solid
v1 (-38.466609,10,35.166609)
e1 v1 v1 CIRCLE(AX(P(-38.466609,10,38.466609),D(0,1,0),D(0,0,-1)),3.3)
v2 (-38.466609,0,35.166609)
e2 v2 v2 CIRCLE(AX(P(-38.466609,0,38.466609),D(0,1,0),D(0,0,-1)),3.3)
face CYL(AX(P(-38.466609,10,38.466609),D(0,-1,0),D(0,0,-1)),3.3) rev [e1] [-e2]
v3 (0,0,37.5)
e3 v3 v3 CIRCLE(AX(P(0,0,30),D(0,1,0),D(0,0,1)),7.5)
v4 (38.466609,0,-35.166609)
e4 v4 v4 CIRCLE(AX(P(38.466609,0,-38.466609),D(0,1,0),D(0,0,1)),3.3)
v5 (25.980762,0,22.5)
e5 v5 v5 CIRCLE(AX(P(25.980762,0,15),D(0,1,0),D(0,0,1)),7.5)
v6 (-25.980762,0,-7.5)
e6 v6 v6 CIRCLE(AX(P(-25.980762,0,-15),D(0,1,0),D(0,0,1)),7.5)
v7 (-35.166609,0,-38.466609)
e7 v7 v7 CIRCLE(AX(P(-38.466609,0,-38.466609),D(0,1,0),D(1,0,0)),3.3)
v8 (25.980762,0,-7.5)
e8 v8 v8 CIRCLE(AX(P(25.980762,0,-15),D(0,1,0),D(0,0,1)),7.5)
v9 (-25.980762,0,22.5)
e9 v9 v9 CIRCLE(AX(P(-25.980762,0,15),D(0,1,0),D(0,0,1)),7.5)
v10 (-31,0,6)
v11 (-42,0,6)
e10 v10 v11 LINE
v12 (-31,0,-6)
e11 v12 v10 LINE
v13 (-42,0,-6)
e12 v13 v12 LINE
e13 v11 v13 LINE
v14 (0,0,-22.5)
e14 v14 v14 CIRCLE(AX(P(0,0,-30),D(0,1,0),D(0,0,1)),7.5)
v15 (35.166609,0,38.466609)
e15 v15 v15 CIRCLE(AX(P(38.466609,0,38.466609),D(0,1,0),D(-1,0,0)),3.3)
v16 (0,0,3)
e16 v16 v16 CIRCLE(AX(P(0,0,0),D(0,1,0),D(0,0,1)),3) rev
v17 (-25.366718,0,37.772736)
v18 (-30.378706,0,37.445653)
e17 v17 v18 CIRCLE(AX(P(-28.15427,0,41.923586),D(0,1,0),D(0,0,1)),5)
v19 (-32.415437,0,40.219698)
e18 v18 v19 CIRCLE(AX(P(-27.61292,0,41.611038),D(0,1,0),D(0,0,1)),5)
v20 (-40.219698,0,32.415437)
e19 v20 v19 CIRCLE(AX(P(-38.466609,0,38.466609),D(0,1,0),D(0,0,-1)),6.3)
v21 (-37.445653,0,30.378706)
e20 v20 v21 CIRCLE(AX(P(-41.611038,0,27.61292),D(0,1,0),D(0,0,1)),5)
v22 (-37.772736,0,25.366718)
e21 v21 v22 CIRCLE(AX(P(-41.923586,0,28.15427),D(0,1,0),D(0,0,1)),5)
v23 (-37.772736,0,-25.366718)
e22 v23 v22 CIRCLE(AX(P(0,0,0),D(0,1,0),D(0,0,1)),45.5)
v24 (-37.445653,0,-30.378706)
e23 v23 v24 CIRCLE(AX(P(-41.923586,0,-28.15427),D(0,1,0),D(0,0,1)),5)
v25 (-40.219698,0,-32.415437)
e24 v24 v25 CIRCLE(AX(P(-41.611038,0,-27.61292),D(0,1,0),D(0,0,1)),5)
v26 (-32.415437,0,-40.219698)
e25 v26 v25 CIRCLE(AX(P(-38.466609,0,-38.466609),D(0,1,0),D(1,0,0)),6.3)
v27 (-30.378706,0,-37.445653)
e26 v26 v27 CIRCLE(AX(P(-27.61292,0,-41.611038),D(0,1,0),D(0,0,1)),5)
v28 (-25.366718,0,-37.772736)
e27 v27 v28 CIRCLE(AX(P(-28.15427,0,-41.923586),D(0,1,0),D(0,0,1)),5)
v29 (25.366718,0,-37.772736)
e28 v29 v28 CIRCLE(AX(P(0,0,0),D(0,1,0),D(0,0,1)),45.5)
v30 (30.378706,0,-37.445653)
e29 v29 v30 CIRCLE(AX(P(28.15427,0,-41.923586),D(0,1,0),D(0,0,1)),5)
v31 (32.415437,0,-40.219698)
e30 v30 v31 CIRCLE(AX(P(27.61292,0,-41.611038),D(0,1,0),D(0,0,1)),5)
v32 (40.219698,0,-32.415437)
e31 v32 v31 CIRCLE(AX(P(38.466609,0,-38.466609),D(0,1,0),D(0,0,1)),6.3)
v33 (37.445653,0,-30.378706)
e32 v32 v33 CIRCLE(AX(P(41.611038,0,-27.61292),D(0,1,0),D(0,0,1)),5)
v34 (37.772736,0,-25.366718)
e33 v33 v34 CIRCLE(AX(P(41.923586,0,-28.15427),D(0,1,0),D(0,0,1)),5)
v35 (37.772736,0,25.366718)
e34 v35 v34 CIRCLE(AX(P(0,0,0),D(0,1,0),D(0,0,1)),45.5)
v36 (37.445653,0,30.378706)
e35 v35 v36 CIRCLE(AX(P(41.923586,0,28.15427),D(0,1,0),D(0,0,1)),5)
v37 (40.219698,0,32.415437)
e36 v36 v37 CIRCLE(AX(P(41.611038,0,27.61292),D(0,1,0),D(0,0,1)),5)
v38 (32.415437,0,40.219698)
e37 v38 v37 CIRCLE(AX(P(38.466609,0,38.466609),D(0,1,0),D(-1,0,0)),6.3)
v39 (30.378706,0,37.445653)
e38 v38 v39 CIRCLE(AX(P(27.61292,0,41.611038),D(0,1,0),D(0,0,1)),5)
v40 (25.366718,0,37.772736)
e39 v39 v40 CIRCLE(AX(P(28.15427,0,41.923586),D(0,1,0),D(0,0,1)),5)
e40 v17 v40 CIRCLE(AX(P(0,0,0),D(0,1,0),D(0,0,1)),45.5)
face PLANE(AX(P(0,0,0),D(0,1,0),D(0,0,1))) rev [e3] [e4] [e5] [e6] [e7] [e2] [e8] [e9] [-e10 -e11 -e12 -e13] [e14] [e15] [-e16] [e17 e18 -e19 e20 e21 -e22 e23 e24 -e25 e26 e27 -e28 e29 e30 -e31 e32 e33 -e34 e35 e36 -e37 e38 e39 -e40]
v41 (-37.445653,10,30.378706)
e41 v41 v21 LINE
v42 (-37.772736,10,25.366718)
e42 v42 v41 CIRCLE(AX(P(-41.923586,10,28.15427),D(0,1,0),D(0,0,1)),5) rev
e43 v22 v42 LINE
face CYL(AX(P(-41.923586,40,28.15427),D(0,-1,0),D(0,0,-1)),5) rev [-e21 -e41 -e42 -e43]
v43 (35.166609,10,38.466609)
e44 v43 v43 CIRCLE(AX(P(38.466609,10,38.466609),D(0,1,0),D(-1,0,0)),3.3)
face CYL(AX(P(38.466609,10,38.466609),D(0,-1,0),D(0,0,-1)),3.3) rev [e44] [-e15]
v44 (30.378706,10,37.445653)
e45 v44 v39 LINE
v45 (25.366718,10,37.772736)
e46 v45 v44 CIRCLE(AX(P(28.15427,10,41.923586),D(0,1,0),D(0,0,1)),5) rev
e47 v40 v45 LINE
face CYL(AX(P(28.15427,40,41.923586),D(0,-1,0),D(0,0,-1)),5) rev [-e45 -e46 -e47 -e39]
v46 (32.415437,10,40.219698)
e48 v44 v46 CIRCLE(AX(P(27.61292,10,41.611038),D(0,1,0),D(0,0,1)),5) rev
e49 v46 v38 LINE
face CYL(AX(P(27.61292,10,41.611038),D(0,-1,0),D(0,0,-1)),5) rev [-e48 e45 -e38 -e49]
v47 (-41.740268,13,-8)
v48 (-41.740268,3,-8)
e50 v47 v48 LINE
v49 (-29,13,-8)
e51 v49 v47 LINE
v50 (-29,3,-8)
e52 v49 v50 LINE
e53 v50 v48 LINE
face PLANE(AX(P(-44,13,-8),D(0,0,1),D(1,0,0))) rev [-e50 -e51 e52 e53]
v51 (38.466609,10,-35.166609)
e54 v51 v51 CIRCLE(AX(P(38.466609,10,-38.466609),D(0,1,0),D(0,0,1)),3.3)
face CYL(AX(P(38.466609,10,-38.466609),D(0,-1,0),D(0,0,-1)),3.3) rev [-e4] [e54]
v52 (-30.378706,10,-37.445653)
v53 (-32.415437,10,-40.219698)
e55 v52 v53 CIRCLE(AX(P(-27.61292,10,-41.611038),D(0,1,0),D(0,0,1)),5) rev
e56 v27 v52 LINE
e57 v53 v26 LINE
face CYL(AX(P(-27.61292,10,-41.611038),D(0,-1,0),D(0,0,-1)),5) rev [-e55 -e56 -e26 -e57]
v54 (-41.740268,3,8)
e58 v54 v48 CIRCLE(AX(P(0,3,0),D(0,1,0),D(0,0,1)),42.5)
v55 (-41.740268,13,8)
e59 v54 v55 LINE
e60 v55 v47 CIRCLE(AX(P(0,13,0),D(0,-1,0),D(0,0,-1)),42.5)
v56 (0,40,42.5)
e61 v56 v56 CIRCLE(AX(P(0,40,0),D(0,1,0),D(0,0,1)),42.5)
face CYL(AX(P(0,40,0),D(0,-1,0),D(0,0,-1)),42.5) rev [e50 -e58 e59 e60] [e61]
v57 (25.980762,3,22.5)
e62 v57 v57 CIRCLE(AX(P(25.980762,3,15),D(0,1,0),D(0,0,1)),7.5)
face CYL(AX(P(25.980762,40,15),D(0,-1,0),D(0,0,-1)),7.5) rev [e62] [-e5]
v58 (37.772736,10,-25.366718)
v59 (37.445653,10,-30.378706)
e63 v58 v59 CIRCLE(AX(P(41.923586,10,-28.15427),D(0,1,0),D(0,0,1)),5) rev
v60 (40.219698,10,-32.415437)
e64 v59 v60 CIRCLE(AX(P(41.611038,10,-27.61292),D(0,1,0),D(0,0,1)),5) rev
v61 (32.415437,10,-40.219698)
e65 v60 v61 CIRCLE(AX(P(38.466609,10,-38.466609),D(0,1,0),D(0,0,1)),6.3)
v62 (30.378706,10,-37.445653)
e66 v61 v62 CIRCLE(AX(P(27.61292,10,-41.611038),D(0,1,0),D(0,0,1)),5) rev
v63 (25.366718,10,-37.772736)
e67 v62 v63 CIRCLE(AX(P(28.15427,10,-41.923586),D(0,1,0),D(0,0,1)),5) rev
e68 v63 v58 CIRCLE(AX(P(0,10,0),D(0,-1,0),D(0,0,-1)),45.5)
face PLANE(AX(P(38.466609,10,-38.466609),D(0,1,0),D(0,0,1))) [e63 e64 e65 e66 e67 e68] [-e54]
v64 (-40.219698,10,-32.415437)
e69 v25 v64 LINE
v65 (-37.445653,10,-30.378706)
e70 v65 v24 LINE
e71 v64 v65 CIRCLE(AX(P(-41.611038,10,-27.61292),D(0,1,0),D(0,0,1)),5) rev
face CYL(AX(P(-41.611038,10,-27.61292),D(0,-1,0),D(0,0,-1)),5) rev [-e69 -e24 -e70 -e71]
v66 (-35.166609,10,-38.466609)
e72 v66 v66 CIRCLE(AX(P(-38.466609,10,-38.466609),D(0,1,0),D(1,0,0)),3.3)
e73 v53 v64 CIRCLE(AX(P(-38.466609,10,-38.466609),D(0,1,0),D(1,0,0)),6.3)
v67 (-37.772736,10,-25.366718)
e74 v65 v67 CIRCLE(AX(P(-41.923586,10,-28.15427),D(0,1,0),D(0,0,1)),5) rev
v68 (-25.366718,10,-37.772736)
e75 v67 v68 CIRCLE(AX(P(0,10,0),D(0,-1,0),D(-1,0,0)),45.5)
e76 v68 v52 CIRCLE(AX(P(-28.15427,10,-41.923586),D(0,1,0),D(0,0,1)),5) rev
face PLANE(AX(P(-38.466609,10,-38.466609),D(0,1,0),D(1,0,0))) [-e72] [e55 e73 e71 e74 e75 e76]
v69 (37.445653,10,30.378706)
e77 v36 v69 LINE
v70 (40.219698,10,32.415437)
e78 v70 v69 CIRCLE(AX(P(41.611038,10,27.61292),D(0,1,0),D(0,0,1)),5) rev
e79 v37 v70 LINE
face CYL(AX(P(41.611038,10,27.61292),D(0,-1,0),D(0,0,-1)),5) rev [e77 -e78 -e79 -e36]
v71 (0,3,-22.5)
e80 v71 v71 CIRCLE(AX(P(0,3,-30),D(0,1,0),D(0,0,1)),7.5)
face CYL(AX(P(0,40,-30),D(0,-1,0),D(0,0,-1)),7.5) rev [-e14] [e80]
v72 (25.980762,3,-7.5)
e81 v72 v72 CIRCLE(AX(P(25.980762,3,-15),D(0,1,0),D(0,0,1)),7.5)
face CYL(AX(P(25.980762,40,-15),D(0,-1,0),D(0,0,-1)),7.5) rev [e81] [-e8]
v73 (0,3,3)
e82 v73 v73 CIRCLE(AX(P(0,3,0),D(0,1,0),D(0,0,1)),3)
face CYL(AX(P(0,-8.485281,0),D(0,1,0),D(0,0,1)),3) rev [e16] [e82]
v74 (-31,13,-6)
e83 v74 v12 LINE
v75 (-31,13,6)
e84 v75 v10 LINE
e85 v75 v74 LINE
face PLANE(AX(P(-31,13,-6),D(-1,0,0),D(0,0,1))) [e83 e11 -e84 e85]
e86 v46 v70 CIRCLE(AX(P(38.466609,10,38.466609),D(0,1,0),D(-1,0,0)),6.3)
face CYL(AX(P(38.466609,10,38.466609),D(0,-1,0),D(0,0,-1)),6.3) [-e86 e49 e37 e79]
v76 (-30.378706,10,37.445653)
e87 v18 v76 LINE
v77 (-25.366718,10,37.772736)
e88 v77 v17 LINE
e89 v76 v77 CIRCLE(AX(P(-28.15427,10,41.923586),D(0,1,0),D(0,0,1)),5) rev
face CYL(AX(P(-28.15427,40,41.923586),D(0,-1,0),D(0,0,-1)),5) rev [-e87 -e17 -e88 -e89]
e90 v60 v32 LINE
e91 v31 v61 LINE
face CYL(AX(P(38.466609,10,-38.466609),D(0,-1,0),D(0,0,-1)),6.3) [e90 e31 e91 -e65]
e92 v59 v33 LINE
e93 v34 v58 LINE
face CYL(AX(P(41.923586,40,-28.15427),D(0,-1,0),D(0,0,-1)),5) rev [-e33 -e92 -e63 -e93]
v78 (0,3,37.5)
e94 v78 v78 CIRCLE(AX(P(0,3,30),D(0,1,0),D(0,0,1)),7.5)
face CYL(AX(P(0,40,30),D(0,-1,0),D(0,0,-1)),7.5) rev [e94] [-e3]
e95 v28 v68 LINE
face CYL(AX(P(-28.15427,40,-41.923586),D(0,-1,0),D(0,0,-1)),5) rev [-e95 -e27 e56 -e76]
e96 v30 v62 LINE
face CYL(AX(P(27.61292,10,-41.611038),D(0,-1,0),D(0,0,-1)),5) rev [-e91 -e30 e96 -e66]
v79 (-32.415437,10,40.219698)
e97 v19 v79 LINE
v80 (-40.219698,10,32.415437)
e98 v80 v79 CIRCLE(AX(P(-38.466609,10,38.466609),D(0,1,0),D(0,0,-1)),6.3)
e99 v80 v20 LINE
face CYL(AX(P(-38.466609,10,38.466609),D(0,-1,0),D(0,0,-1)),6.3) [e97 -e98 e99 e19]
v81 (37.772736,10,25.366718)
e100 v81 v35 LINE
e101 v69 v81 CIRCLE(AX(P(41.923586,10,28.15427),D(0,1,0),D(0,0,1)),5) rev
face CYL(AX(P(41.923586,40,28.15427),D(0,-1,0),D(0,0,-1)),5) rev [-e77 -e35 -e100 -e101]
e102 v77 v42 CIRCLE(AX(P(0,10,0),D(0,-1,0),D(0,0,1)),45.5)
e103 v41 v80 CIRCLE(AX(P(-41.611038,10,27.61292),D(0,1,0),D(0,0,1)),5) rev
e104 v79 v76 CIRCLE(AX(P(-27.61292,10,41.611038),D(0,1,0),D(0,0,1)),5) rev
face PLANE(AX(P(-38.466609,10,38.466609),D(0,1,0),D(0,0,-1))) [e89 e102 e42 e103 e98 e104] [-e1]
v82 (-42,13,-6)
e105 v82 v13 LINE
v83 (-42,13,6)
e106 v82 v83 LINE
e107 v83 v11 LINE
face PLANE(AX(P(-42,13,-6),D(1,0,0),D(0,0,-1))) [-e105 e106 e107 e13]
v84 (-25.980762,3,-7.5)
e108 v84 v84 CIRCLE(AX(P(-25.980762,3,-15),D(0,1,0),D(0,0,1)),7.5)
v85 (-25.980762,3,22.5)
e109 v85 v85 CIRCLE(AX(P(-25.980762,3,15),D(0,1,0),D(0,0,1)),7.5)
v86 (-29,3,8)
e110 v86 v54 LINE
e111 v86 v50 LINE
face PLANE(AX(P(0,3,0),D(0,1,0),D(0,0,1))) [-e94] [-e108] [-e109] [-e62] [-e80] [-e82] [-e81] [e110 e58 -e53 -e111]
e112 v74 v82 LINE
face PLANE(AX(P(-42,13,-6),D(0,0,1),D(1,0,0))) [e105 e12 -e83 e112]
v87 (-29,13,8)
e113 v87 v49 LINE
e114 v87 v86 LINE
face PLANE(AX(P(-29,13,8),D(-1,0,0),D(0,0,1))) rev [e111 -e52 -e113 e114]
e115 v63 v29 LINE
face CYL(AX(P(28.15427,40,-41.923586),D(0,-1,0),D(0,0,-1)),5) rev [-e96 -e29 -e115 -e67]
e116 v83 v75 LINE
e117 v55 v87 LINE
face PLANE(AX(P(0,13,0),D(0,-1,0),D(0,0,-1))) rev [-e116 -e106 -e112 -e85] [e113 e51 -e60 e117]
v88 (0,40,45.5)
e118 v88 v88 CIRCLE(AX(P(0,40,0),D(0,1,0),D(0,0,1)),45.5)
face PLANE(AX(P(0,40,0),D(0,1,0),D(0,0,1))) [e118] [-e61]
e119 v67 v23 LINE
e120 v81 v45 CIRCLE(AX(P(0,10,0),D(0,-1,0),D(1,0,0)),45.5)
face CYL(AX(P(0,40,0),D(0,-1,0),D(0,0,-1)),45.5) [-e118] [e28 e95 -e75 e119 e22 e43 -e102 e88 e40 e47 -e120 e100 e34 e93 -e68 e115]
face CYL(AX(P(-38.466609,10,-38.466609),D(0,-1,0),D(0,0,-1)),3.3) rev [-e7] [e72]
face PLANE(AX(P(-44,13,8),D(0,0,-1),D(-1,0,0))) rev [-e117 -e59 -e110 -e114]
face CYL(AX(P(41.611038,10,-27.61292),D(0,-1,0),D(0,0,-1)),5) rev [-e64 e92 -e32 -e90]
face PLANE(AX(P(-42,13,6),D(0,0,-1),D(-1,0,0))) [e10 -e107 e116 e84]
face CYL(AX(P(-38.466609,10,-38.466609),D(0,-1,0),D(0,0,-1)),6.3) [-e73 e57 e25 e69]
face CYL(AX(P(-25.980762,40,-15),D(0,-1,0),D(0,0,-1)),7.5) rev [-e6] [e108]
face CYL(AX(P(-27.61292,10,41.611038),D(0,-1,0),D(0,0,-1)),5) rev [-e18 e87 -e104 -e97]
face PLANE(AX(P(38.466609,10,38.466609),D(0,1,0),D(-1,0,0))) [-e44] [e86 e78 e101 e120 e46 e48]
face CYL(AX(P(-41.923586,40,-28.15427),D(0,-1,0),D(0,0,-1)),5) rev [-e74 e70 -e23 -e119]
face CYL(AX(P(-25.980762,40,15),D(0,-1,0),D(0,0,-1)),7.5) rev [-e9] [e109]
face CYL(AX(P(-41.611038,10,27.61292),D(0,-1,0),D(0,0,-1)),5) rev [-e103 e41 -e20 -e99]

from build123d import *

# Parameters (mm, degrees)
SKETCH1_R               = 45.5
BOSS_EXTRUDE1_DEPTH     = 40
SHELL1_T                = -3
CUT_EXTRUDE2_DEPTH      = 76.766087401
CUT_EXTRUDE2_DEPTH_BACK = 76.766087401
SKETCH3_R               = 7.5
SKETCH4_R               = 3
CUT_EXTRUDE3_DEPTH      = 3
SKETCH6_W               = 15
SKETCH6_H               = 16
SKETCH6_W_2             = 11
SKETCH6_H_2             = 12
BOSS_EXTRUDE2_DEPTH     = 10
SKETCH7_W               = 11
SKETCH7_H               = 12
CUT_EXTRUDE5_DEPTH      = 3
SKETCH8_R               = 3.3
BOSS_EXTRUDE3_DEPTH     = 10
CIRPATTERN1_COUNT       = 4
FILLET1_R               = 5


with BuildPart() as part:
    # Sketch1 → Boss-Extrude1 (new body)
    with BuildSketch(Plane(origin=(0, 0, 0), x_dir=(1, 0, 0), z_dir=(0, 1, 0))):
        with Locations(Location((0, 0, 0), (0, 0, 270))):
            Circle(SKETCH1_R)
    extrude(amount=BOSS_EXTRUDE1_DEPTH)

    # Shell1
    shell1_openings = [part.faces().sort_by_distance(p)[0] for p in [
        (0, 40, 0),
    ]]
    offset(amount=SHELL1_T, openings=shell1_openings, kind=Kind.INTERSECTION)

    # Sketch3 → Cut-Extrude2 (cut, two sides: drawn at the far end of the back side and taken through both)
    with BuildSketch(Plane.XZ.offset(-CUT_EXTRUDE2_DEPTH_BACK)):
        with Locations(Location((0, 30, 0), (0, 0, 90))):
            Circle(SKETCH3_R)
        with Locations(Location((25.980762114, 15, 0), (0, 0, 90))):
            Circle(SKETCH3_R)
        with Locations(Location((25.980762114, -15, 0), (0, 0, 90))):
            Circle(SKETCH3_R)
        with Locations(Location((0, -30, 0), (0, 0, 90))):
            Circle(SKETCH3_R)
        with Locations(Location((-25.980762114, -15, 0), (0, 0, 90))):
            Circle(SKETCH3_R)
        with Locations(Location((-25.980762114, 15, 0), (0, 0, 90))):
            Circle(SKETCH3_R)
    extrude(amount=CUT_EXTRUDE2_DEPTH + CUT_EXTRUDE2_DEPTH_BACK, mode=Mode.SUBTRACT)

    # Sketch4 → Cut-Extrude3 (cut)
    with BuildSketch(Plane(origin=(0, 3, 0), x_dir=(1, 0, 0), z_dir=(0, 1, 0))):
        with Locations(Location((0, 0, 0), (0, 0, 270))):
            Circle(SKETCH4_R)
    extrude(amount=-CUT_EXTRUDE3_DEPTH, mode=Mode.SUBTRACT)

    # Sketch6 → Boss-Extrude2 (add)
    with BuildSketch(Plane(origin=(0, 3, 0), x_dir=(1, 0, 0), z_dir=(0, 1, 0))):
        with Locations((-36.5, 0)):
            Rectangle(SKETCH6_W, SKETCH6_H)
        with Locations((-36.5, 0)):
            Rectangle(SKETCH6_W_2, SKETCH6_H_2, mode=Mode.SUBTRACT)
    extrude(amount=BOSS_EXTRUDE2_DEPTH)

    # Sketch7 → Cut-Extrude5 (cut)
    with BuildSketch(Plane(origin=(0, 3, 0), x_dir=(1, 0, 0), z_dir=(0, 1, 0))):
        with Locations((-36.5, 0)):
            Rectangle(SKETCH7_W, SKETCH7_H)
    extrude(amount=-CUT_EXTRUDE5_DEPTH, mode=Mode.SUBTRACT)

    # Sketch8 → Boss-Extrude3 (add)
    with BuildSketch(Plane(origin=(0, 0, 0), x_dir=(1, 0, 0), z_dir=(0, 1, 0))):
        with BuildLine():
            Line((32.166608897, 38.466608897), (27.854823504, 35.97719844))
            ThreePointArc((27.854823504, 35.97719844), (32.173358544, 32.173358544), (35.97719844, 27.854823504))
            Line((35.97719844, 27.854823504), (38.466608897, 32.166608897))
            ThreePointArc((38.466608897, 32.166608897), (42.921381618, 42.921381618), (32.166608897, 38.466608897))
        make_face()
        with Locations(Location((38.466608897, 38.466608897, 0), (0, 0, 270))):
            Circle(SKETCH8_R, mode=Mode.SUBTRACT)
    boss_extrude3 = extrude(amount=BOSS_EXTRUDE3_DEPTH)

    # CirPattern1: Boss-Extrude3 ×4 about axis
    cirpattern1_axis = Axis((0, 0, 0), (0, 1, 0))
    for i in range(1, CIRPATTERN1_COUNT):
        add(boss_extrude3.rotate(cirpattern1_axis, i * 360 / CIRPATTERN1_COUNT))

    # Fillet1
    # the kernel refuses this fillet: 5 mm, written as the material it adds along each edge
    with BuildSketch(Plane(origin=(-38.466608897, 0, 32.166608897), x_dir=(0.5000000000000063, 0, -0.866025403784435), z_dir=(0, 1, 0)), Plane(origin=(32.166608897, 0, 38.466608897), x_dir=(-0.8660254037844374, 0, -0.5000000000000022), z_dir=(0, 1, 0)), Plane(origin=(38.466608897, 0, -32.166608897), x_dir=(-0.5000000000000032, 0, 0.8660254037844368), z_dir=(0, 1, 0)), Plane(origin=(-32.166608897, 0, -38.466608897), x_dir=(0.8660254037844356, 0, 0.5000000000000054), z_dir=(0, 1, 0))) as fillet1_piece_1:
        with BuildLine():
            CenterArc((2.371395832, 5), FILLET1_R, 226.156864412, 43.843135588)
            ThreePointArc((-1.092035972, 1.39380531), (-0.496806454, 0.735459519), (0, 0))
            Line((0, 0), (2.371395832, 0))
        make_face()
    extrude(amount=10)
    with BuildSketch(Plane(origin=(-32.166608897, 0, 38.466608897), x_dir=(0.8660254037844327, 0, -0.5000000000000103), z_dir=(0, 1, 0)), Plane(origin=(38.466608897, 0, 32.166608897), x_dir=(-0.5000000000000117, 0, -0.8660254037844319), z_dir=(0, 1, 0)), Plane(origin=(32.166608897, 0, -38.466608897), x_dir=(-0.8660254037844319, 0, 0.5000000000000117), z_dir=(0, 1, 0)), Plane(origin=(-38.466608897, 0, -32.166608897), x_dir=(0.500000000000011, 0, 0.8660254037844324), z_dir=(0, 1, 0))) as fillet1_piece_2:
        with BuildLine():
            CenterArc((2.371395832, -5), FILLET1_R, 90, 43.843135588)
            ThreePointArc((-1.092035972, -1.39380531), (-0.496806454, -0.735459519), (0, 0))
            Line((0, 0), (2.371395832, 0))
        make_face()
    extrude(amount=10)
    with BuildSketch(Plane(origin=(-27.854823504, 0, 35.97719844), x_dir=(0.8108999282777639, 0, 0.5851848479917412), z_dir=(0, 1, 0)), Plane(origin=(35.97719844, 0, 27.854823504), x_dir=(0.5851848479917567, 0, -0.8108999282777527), z_dir=(0, 1, 0)), Plane(origin=(27.854823504, 0, -35.97719844), x_dir=(-0.8108999282777679, 0, -0.5851848479917359), z_dir=(0, 1, 0)), Plane(origin=(-35.97719844, 0, -27.854823504), x_dir=(-0.5851848479917252, 0, 0.8108999282777755), z_dir=(0, 1, 0))) as fillet1_piece_3:
        with BuildLine():
            CenterArc((3.236915302, -4.997156955), FILLET1_R, 91.932257762, 63.883791986)
            Line((-1.32425924, -2.948819386), (0, 0))
            ThreePointArc((0, 0), (1.534162982, -0.025871708), (3.068325963, 0))
        make_face()
    extrude(amount=10)
    with BuildSketch(Plane(origin=(-35.97719844, 0, 27.854823504), x_dir=(-0.5851848479917389, 0, -0.8108999282777657), z_dir=(0, 1, 0)), Plane(origin=(27.854823504, 0, 35.97719844), x_dir=(-0.8108999282777541, 0, 0.5851848479917549), z_dir=(0, 1, 0)), Plane(origin=(35.97719844, 0, -27.854823504), x_dir=(0.5851848479917436, 0, 0.8108999282777621), z_dir=(0, 1, 0)), Plane(origin=(-27.854823504, 0, -35.97719844), x_dir=(0.8108999282777745, 0, -0.5851848479917268), z_dir=(0, 1, 0))) as fillet1_piece_4:
        with BuildLine():
            CenterArc((3.236915302, 4.997156955), FILLET1_R, 204.183950253, 63.883791986)
            Line((-1.32425924, 2.948819386), (0, 0))
            ThreePointArc((0, 0), (1.534162982, 0.025871708), (3.068325963, 0))
        make_face()
    extrude(amount=10)


solid = part.part
